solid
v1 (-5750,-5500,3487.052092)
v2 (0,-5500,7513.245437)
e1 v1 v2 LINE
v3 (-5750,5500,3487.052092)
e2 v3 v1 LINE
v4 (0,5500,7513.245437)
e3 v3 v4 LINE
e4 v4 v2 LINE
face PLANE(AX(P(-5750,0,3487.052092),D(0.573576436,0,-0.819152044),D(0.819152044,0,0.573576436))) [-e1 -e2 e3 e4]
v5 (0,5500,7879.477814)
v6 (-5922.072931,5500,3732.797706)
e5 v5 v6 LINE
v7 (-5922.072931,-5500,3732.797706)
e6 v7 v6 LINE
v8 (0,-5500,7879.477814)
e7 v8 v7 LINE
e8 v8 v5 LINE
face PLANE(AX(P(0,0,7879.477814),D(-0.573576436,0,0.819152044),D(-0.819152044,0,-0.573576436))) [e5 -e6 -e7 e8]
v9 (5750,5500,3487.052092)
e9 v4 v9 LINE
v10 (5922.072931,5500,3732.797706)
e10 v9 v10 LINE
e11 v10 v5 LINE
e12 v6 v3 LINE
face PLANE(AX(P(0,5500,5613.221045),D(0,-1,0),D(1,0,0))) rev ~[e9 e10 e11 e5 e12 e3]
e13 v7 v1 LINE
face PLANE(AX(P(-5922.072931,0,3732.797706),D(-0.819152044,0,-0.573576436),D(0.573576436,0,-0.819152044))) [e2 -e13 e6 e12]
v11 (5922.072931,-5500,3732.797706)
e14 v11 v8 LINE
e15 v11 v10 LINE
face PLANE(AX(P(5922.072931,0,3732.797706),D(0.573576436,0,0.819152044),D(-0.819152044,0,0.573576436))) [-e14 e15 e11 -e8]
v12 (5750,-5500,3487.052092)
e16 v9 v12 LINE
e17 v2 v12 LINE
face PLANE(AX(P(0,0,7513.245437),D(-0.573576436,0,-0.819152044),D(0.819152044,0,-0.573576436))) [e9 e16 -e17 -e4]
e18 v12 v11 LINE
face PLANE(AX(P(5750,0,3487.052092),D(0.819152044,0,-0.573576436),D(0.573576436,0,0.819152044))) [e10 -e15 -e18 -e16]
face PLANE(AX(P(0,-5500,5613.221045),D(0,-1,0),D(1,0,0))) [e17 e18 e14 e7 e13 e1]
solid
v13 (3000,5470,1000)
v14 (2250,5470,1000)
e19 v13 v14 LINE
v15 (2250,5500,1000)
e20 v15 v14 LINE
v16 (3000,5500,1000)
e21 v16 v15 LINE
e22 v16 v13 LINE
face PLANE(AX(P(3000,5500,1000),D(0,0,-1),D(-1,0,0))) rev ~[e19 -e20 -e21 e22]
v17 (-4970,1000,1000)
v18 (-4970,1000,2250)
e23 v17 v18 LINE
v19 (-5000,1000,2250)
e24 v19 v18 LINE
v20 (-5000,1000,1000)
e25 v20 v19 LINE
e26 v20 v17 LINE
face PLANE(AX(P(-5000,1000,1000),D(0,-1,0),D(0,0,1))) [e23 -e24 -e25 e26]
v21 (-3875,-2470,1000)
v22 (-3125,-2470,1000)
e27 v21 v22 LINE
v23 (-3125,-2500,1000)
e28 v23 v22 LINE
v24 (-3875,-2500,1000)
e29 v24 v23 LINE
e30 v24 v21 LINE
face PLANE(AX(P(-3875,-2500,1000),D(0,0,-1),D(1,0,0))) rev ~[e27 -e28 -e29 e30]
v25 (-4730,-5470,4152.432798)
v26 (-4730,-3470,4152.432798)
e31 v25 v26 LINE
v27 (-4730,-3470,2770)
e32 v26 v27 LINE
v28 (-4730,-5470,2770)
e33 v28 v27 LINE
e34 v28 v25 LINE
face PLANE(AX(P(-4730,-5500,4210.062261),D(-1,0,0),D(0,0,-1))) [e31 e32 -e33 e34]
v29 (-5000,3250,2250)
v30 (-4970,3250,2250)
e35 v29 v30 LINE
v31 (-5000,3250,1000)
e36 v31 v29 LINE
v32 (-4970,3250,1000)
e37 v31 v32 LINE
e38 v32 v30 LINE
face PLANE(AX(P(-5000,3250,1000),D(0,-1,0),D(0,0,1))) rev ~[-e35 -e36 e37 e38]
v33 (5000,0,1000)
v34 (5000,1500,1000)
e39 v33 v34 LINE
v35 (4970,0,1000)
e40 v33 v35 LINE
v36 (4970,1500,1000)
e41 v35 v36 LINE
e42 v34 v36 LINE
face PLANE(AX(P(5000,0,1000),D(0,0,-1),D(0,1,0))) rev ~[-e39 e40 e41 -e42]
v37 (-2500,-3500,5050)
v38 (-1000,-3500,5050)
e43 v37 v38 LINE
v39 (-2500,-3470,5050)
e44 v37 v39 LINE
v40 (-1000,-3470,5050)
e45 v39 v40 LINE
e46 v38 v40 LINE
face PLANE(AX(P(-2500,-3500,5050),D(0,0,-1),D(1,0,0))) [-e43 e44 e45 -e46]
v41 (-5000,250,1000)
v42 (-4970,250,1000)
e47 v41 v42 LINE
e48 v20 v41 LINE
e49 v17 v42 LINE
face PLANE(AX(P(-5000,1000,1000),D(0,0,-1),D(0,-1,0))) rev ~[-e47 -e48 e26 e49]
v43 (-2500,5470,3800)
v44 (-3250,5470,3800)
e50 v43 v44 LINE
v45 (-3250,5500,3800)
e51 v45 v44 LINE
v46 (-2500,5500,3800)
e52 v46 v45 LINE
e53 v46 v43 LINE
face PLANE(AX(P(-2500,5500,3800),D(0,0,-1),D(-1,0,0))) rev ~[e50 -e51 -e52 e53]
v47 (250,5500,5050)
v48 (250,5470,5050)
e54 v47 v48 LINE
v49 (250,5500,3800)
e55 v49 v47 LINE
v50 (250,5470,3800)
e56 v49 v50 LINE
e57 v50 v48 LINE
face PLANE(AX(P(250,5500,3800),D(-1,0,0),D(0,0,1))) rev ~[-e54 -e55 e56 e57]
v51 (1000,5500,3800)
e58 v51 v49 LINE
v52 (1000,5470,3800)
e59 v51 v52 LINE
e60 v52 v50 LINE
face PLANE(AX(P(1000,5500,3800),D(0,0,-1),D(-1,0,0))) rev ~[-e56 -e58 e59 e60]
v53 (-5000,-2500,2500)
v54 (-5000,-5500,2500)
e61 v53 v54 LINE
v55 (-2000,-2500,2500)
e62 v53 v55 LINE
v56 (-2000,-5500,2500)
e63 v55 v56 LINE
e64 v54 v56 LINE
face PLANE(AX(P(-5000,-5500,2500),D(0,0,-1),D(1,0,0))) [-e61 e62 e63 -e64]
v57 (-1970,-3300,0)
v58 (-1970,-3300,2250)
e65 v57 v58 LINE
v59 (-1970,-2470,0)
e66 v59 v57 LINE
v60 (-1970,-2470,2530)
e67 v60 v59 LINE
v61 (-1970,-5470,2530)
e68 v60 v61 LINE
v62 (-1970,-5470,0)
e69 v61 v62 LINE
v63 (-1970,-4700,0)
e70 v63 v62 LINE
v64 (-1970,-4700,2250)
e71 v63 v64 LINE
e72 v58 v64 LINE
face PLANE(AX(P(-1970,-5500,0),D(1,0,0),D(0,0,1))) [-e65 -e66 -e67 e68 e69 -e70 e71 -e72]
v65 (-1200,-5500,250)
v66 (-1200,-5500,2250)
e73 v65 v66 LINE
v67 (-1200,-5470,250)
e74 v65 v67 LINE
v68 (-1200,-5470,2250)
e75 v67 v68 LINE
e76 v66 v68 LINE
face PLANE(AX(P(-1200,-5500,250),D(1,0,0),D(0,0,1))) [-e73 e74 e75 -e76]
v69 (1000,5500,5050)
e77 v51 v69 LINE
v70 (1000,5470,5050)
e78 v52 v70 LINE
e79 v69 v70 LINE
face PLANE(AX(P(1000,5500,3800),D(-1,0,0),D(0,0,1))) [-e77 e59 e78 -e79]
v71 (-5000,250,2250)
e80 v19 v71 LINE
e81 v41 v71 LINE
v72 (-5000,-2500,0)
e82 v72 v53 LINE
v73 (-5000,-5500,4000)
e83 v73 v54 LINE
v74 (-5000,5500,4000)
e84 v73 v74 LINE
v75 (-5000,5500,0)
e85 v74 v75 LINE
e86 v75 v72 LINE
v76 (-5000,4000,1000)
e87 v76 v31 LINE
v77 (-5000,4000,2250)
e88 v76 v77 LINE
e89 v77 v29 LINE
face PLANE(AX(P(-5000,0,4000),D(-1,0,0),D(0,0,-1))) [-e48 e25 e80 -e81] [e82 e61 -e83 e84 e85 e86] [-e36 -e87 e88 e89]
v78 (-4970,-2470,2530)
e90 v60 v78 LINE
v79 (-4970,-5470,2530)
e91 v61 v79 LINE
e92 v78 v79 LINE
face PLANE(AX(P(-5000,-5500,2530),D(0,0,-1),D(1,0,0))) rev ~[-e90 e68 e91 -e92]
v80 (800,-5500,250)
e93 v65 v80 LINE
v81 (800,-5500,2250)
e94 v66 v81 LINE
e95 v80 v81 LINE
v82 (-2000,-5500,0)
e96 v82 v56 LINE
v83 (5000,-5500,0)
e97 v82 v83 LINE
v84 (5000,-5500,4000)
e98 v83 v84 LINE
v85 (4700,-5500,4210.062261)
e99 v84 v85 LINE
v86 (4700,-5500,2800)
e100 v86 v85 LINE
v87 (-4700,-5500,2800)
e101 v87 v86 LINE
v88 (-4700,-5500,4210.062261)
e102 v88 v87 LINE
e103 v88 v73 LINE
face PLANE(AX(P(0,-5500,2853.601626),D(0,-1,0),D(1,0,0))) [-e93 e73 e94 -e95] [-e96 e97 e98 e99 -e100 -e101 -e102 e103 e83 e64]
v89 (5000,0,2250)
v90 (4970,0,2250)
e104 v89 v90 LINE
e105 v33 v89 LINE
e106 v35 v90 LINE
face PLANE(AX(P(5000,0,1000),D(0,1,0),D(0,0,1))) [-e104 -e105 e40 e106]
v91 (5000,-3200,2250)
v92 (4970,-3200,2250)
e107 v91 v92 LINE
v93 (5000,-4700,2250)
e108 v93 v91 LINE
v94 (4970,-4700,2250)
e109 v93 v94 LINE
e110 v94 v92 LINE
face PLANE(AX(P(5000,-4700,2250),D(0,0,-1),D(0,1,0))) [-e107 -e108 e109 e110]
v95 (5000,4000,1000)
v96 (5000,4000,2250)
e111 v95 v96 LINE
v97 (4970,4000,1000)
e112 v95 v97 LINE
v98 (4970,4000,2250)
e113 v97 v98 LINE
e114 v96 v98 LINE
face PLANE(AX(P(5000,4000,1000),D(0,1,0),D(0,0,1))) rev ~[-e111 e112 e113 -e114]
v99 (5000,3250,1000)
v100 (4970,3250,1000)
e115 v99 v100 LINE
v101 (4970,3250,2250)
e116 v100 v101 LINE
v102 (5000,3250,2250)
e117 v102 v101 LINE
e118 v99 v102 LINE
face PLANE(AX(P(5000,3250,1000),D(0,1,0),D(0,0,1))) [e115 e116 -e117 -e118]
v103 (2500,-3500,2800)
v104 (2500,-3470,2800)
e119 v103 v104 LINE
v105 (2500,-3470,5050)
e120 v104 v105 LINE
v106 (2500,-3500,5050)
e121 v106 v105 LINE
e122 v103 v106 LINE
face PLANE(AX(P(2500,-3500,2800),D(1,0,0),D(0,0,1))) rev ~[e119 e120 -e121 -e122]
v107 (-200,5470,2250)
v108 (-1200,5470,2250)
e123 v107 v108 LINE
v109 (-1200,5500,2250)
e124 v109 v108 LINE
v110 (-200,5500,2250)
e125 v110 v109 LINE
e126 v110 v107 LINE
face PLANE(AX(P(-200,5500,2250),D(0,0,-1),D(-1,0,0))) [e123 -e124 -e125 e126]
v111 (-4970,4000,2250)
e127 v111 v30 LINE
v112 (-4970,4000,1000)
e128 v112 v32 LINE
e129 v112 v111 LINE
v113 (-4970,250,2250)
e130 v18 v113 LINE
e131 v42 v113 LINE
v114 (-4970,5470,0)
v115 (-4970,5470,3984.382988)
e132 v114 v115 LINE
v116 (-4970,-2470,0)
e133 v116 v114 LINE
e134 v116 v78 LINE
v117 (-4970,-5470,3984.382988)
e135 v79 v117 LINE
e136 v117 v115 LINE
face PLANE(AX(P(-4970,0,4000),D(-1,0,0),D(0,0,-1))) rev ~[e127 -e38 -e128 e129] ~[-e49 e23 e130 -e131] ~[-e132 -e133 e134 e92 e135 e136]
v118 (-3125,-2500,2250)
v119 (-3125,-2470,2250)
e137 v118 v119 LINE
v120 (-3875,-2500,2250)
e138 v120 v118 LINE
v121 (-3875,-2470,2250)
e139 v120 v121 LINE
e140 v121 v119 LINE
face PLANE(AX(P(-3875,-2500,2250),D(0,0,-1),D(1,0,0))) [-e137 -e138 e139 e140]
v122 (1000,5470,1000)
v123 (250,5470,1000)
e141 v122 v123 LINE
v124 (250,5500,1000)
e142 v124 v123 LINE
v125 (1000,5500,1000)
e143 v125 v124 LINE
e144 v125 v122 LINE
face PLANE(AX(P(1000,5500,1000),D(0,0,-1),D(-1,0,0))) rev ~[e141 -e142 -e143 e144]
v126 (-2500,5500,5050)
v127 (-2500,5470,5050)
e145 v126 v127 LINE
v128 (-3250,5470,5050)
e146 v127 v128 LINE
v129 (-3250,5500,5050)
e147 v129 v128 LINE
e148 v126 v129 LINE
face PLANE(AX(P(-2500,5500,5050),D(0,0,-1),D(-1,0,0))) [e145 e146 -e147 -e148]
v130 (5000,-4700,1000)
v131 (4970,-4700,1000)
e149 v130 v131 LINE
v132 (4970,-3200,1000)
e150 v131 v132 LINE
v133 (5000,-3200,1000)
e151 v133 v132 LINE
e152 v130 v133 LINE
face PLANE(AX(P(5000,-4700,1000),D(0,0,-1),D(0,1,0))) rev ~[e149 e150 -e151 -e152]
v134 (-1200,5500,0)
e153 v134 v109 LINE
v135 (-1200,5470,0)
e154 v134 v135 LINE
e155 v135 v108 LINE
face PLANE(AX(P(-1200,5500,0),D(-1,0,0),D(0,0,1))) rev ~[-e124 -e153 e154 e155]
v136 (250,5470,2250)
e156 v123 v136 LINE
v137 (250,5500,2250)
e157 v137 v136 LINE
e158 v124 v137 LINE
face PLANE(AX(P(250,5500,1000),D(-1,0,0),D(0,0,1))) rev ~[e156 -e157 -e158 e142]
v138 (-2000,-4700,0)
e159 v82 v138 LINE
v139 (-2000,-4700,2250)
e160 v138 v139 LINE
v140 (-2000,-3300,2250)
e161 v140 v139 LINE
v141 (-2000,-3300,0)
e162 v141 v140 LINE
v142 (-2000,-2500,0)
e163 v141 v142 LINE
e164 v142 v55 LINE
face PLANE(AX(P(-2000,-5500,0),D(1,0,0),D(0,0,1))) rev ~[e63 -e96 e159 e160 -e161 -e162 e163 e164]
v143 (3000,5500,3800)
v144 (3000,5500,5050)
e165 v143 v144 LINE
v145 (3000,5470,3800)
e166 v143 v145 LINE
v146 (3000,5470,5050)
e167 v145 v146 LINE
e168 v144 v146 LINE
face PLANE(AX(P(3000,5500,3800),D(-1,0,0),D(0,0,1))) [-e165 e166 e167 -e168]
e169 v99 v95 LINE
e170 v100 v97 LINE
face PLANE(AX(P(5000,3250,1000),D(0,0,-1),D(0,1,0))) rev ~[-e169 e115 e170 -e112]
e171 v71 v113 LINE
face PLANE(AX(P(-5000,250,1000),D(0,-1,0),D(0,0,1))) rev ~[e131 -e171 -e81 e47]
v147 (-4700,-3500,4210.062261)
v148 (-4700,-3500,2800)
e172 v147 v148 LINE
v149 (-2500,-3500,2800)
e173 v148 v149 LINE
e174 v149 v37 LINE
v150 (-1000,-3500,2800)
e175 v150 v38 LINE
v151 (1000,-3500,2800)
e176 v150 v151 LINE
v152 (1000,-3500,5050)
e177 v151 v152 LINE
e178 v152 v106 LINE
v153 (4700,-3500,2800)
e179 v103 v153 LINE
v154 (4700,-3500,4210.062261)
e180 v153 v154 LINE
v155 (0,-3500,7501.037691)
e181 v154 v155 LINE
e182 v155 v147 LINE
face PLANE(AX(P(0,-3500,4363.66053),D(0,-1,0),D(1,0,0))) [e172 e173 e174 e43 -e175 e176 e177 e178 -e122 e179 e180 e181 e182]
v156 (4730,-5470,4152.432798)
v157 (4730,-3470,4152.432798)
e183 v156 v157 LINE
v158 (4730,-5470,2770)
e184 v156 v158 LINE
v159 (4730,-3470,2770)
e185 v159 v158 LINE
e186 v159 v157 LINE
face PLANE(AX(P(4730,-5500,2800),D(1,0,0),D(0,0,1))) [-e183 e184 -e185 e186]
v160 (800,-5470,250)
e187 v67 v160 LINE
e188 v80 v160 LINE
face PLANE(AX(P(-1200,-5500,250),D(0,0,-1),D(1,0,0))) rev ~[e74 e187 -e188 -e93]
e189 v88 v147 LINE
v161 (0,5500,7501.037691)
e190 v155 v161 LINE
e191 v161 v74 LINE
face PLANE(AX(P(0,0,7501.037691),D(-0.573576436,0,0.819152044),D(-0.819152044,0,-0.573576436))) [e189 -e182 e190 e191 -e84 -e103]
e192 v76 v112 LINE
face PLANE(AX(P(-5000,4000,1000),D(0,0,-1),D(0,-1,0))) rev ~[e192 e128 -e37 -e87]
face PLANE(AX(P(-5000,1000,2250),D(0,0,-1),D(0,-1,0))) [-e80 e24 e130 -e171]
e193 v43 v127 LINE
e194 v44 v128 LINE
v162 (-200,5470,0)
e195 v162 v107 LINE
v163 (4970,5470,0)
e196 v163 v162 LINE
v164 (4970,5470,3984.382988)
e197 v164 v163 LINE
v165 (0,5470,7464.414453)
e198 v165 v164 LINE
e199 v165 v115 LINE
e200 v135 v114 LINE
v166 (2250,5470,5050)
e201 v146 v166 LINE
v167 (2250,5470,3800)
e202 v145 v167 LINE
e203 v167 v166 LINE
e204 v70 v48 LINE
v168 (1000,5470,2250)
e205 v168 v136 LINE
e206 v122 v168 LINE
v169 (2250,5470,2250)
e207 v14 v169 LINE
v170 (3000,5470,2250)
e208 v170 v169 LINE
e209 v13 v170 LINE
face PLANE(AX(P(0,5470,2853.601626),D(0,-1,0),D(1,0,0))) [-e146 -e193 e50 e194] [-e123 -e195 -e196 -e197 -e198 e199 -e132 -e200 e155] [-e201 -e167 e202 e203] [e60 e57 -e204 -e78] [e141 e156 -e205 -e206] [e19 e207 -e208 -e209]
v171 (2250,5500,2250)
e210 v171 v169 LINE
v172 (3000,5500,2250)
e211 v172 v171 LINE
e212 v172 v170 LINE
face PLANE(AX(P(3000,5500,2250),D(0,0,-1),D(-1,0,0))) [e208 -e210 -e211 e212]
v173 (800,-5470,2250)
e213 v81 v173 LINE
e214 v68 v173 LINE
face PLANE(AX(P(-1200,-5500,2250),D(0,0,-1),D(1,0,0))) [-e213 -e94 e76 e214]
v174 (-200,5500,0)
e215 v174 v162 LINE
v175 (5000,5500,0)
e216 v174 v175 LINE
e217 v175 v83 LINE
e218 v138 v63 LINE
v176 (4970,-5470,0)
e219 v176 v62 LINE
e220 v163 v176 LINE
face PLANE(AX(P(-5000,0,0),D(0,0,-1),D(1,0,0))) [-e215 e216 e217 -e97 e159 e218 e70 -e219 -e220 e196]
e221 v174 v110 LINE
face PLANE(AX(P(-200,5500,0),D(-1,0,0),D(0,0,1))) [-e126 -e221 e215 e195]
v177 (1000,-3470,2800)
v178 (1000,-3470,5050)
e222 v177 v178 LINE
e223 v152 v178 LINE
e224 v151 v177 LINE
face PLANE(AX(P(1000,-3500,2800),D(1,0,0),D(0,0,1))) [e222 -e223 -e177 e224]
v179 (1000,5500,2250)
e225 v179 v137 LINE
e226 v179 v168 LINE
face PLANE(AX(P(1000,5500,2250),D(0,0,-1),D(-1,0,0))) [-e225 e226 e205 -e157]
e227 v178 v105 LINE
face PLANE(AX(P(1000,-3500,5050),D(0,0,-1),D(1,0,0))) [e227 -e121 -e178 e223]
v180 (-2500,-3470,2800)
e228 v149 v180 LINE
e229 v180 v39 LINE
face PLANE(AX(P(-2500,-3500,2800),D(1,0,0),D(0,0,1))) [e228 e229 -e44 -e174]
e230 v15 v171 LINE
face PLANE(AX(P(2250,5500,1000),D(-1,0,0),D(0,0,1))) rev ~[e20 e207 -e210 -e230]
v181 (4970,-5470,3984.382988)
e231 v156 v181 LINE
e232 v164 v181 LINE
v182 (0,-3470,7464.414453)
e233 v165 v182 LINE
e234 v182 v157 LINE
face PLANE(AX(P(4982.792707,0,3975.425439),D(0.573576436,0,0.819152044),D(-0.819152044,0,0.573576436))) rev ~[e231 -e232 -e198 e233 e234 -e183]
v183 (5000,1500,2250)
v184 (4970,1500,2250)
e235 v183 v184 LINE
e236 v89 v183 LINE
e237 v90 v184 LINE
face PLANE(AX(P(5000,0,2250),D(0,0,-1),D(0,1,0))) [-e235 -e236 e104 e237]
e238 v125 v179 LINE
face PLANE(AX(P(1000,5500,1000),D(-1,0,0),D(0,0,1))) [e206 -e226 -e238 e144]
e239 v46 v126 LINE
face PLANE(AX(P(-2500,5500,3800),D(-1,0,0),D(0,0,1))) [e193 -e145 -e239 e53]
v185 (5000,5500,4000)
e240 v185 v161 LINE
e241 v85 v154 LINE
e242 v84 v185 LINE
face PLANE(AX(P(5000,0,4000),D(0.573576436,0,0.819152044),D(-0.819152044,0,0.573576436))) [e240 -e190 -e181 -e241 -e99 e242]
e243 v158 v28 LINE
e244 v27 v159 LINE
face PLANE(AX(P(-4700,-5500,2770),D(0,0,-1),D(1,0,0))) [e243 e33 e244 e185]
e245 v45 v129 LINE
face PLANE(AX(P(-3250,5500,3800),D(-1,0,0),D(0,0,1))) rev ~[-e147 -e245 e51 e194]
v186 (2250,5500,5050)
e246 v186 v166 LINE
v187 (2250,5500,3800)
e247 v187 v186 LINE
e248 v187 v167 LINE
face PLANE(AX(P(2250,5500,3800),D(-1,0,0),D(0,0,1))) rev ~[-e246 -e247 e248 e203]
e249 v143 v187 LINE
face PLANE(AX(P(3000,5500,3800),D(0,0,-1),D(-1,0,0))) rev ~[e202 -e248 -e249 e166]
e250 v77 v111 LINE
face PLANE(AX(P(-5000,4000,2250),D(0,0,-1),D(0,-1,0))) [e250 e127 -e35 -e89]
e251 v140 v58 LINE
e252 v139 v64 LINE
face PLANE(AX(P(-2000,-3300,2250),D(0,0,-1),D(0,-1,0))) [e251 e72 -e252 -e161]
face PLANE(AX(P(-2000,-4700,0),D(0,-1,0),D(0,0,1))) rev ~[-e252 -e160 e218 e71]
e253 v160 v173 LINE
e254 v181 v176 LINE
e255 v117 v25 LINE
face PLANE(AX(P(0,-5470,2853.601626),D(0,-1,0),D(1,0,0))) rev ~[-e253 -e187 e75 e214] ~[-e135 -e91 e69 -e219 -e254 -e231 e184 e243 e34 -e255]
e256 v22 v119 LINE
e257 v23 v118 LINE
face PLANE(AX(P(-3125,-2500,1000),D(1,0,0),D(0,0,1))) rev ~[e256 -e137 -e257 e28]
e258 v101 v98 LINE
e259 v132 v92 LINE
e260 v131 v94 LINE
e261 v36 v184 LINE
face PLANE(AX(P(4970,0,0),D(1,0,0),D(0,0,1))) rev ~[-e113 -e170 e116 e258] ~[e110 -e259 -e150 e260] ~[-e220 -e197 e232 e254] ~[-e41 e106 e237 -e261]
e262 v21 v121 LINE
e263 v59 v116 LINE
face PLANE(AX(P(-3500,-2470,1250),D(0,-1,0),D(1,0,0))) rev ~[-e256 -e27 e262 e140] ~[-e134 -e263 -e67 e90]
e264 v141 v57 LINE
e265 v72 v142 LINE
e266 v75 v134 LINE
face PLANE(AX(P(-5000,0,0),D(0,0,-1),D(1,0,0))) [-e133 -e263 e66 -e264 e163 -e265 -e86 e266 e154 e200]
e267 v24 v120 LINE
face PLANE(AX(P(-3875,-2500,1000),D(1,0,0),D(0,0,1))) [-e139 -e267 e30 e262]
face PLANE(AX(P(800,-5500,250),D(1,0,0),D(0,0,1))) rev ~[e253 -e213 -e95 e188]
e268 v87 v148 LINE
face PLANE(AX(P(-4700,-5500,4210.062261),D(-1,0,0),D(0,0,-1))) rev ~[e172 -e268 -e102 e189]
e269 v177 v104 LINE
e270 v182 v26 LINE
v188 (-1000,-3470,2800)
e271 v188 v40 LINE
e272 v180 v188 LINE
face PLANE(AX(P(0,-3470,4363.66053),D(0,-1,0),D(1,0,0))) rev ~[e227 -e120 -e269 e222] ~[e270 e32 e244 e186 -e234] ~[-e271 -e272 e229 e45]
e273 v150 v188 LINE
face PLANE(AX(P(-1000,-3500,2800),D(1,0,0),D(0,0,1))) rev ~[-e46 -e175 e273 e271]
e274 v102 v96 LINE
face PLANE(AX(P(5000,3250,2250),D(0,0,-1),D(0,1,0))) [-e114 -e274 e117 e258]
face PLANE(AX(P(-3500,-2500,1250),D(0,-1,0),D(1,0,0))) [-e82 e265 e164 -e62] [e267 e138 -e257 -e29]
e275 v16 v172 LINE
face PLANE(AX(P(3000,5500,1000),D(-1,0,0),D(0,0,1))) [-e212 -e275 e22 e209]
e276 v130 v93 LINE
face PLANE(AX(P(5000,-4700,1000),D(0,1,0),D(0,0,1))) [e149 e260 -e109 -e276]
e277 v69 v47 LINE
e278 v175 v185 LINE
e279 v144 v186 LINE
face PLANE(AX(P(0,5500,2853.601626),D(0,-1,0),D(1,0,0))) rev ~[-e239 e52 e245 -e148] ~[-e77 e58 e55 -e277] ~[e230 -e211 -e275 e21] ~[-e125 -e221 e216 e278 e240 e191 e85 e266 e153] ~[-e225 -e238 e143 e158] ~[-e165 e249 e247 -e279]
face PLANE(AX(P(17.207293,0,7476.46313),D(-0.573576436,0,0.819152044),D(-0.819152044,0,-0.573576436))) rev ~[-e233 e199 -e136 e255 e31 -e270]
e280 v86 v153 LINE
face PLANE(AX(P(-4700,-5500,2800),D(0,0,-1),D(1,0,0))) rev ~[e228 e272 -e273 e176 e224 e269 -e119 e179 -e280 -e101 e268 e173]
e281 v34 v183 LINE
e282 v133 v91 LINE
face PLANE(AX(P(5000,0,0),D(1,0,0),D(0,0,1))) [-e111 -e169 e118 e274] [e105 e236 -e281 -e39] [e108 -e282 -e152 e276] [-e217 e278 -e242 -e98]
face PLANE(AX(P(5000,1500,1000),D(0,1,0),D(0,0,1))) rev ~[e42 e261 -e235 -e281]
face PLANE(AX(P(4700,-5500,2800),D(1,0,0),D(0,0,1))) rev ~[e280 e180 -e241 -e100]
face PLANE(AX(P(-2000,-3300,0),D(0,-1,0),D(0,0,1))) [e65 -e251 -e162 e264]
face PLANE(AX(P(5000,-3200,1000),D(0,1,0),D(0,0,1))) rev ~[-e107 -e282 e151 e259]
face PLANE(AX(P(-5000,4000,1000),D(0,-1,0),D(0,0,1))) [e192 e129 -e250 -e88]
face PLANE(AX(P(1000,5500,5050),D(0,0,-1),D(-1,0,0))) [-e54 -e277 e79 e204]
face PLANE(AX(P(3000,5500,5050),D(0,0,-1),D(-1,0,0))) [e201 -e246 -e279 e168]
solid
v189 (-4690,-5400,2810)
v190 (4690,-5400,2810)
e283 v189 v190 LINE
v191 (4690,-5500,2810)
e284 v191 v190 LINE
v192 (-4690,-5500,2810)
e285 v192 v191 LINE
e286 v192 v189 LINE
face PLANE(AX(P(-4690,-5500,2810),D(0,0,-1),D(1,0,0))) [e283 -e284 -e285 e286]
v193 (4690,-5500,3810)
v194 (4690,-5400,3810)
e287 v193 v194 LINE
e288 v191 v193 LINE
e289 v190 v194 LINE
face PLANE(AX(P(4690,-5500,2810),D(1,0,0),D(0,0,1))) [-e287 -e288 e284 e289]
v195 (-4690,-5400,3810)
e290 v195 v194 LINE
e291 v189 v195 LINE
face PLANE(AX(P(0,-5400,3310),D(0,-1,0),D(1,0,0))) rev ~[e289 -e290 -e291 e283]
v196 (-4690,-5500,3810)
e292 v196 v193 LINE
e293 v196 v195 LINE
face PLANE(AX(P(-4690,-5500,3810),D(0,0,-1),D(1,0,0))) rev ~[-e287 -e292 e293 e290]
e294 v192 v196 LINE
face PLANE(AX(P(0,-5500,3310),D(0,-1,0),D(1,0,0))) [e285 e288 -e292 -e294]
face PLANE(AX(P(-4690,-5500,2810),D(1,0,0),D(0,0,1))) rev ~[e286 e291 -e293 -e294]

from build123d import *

# Parameters (mm, degrees)
F1_DEPTH      = 5500
F1_DEPTH_BACK = 5500
F2_W          = 3000
F2_H          = 2500
F3_DEPTH      = 2000
F5_DEPTH      = 5500
F5_DEPTH_BACK = 5500
F6_W          = 3000
F6_H          = 2500
F7_DEPTH      = 1000
F8_T          = -30
F9_W          = 1500
F9_H          = 2250
F10_DEPTH     = 30
F11_W         = 1400
F11_H         = 2250
F12_DEPTH     = 30
F13_W         = 2000
F13_H         = 2000
F14_DEPTH     = 30
F15_W         = 1500
F15_H         = 1250
F15_W_2       = 750
F16_DEPTH     = 30
F17_W         = 9380
F17_H         = 1000
F18_DEPTH     = 100
F19_W         = 750
F19_H         = 1250
F20_DEPTH     = 30
F21_W         = 750
F21_H         = 1250
F21_W_2       = 1000
F21_H_2       = 2250
F22_DEPTH     = 30
F23_W         = 750
F23_H         = 1250
F24_DEPTH     = 30


# Not quite as in the source:
# - a feature names something its author has since deleted; it is built from what else it names


with BuildPart() as f1:
    # F0 (on Front) → F1 (new body, two sides)
    with BuildSketch(Plane.XZ) as f1_sk:
        Polygon((-5000, 4000), (-5000, 0), (5000, 0), (5000, 4000), (0, 7501.0376910485), align=None)
    extrude(amount=F1_DEPTH)
    extrude(f1_sk.sketch, amount=-F1_DEPTH_BACK)

    # F2 (on face) → F3 (cut)
    with BuildSketch(Plane.XZ.offset(5500)):
        Polygon((4700, 4210.0622614629), (0, 7501.0376910485), (-4700, 4210.0622614629), (-4700, 2800), (4700, 2800), align=None)
        with Locations((-3500, 1250)):
            Rectangle(F2_W, F2_H)
    extrude(amount=-F3_DEPTH, mode=Mode.SUBTRACT)

    # F6 (on face) → F7 (cut)
    with BuildSketch(Plane.XZ.offset(3500)):
        with Locations((-3500, 1250)):
            Rectangle(F6_W, F6_H)
    extrude(amount=-F7_DEPTH, mode=Mode.SUBTRACT)

    # F8
    f8_openings = [f1.faces().sort_by_distance(p)[0] for p in [
        (311.881188, 356.435644, 0),
    ]]
    offset(amount=F8_T, openings=f8_openings, kind=Kind.INTERSECTION)

    # F9 (on face) → F10 (cut, through all)
    with BuildSketch(Plane.XZ.offset(3500)):
        with Locations((-1750, 3925)):
            Rectangle(F9_W, F9_H)
        with Locations((1750, 3925)):
            Rectangle(F9_W, F9_H)
    extrude(amount=-F10_DEPTH, mode=Mode.SUBTRACT)

    # F11 (on face) → F12 (cut, through all)
    with BuildSketch(Plane(origin=(-2000, 0, 0), x_dir=(0, -1, 0), z_dir=(-1, 0, 0))):
        with Locations((4000, 1125)):
            Rectangle(F11_W, F11_H)
    extrude(amount=-F12_DEPTH, mode=Mode.SUBTRACT)

    # F13 (on face) → F14 (cut, through all)
    with BuildSketch(Plane.XZ.offset(5500)):
        with Locations((-200, 1250)):
            Rectangle(F13_W, F13_H)
    extrude(amount=-F14_DEPTH, mode=Mode.SUBTRACT)

    # F15 (on face) → F16 (cut, through all)
    with BuildSketch(Plane.YZ.offset(5000)):
        with Locations((-3950, 1625)):
            Rectangle(F15_W, F15_H)
        with Locations((750, 1625)):
            Rectangle(F15_W, F15_H)
        with Locations((3625, 1625)):
            Rectangle(F15_W_2, F15_H)
    extrude(amount=-F16_DEPTH, mode=Mode.SUBTRACT)

    # F19 (on face) → F20 (cut, through all)
    with BuildSketch(Plane.XZ.offset(2500)):
        with Locations((-3500, 1625)):
            Rectangle(F19_W, F19_H)
    extrude(amount=-F20_DEPTH, mode=Mode.SUBTRACT)

    # F21 (on face) → F22 (cut, through all)
    with BuildSketch(Plane(origin=(0, 5500, 0), x_dir=(-1, 0, 0), z_dir=(0, 1, 0))):
        with Locations((-2625, 1625)):
            Rectangle(F21_W, F21_H)
        with Locations((-625, 1625)):
            Rectangle(F21_W, F21_H)
        with Locations((700, 1125)):
            Rectangle(F21_W_2, F21_H_2)
        with Locations((-2625, 4425)):
            Rectangle(F21_W, F21_H)
        with Locations((-625, 4425)):
            Rectangle(F21_W, F21_H)
        with Locations((2875, 4425)):
            Rectangle(F21_W, F21_H)
    extrude(amount=-F22_DEPTH, mode=Mode.SUBTRACT)

    # F23 (on face) → F24 (cut, through all)
    with BuildSketch(Plane(origin=(-5000, 0, 0), x_dir=(0, -1, 0), z_dir=(-1, 0, 0))):
        with Locations((-3625, 1625)):
            Rectangle(F23_W, F23_H)
        with Locations((-625, 1625)):
            Rectangle(F23_W, F23_H)
    extrude(amount=-F24_DEPTH, mode=Mode.SUBTRACT)


with BuildPart() as f5:
    # F4 (on Front) → F5 (new body, two sides)
    with BuildSketch(Plane.XZ) as f5_sk:
        Polygon((-5922.0729309053, 3732.797705517), (-5750, 3487.0520922303), (0, 7513.2454369362), (5750, 3487.0520922303), (5922.0729309053, 3732.797705517), (0, 7879.4778135646), align=None)
    extrude(amount=F5_DEPTH)
    extrude(f5_sk.sketch, amount=-F5_DEPTH_BACK)


with BuildPart() as f18:
    # F17 (on face) → F18 (new body)
    with BuildSketch(Plane.XZ.offset(5500)):
        with Locations((0, 3310)):
            Rectangle(F17_W, F17_H)
    extrude(amount=-F18_DEPTH)


solid = Compound([f1.part, f5.part, f18.part])
